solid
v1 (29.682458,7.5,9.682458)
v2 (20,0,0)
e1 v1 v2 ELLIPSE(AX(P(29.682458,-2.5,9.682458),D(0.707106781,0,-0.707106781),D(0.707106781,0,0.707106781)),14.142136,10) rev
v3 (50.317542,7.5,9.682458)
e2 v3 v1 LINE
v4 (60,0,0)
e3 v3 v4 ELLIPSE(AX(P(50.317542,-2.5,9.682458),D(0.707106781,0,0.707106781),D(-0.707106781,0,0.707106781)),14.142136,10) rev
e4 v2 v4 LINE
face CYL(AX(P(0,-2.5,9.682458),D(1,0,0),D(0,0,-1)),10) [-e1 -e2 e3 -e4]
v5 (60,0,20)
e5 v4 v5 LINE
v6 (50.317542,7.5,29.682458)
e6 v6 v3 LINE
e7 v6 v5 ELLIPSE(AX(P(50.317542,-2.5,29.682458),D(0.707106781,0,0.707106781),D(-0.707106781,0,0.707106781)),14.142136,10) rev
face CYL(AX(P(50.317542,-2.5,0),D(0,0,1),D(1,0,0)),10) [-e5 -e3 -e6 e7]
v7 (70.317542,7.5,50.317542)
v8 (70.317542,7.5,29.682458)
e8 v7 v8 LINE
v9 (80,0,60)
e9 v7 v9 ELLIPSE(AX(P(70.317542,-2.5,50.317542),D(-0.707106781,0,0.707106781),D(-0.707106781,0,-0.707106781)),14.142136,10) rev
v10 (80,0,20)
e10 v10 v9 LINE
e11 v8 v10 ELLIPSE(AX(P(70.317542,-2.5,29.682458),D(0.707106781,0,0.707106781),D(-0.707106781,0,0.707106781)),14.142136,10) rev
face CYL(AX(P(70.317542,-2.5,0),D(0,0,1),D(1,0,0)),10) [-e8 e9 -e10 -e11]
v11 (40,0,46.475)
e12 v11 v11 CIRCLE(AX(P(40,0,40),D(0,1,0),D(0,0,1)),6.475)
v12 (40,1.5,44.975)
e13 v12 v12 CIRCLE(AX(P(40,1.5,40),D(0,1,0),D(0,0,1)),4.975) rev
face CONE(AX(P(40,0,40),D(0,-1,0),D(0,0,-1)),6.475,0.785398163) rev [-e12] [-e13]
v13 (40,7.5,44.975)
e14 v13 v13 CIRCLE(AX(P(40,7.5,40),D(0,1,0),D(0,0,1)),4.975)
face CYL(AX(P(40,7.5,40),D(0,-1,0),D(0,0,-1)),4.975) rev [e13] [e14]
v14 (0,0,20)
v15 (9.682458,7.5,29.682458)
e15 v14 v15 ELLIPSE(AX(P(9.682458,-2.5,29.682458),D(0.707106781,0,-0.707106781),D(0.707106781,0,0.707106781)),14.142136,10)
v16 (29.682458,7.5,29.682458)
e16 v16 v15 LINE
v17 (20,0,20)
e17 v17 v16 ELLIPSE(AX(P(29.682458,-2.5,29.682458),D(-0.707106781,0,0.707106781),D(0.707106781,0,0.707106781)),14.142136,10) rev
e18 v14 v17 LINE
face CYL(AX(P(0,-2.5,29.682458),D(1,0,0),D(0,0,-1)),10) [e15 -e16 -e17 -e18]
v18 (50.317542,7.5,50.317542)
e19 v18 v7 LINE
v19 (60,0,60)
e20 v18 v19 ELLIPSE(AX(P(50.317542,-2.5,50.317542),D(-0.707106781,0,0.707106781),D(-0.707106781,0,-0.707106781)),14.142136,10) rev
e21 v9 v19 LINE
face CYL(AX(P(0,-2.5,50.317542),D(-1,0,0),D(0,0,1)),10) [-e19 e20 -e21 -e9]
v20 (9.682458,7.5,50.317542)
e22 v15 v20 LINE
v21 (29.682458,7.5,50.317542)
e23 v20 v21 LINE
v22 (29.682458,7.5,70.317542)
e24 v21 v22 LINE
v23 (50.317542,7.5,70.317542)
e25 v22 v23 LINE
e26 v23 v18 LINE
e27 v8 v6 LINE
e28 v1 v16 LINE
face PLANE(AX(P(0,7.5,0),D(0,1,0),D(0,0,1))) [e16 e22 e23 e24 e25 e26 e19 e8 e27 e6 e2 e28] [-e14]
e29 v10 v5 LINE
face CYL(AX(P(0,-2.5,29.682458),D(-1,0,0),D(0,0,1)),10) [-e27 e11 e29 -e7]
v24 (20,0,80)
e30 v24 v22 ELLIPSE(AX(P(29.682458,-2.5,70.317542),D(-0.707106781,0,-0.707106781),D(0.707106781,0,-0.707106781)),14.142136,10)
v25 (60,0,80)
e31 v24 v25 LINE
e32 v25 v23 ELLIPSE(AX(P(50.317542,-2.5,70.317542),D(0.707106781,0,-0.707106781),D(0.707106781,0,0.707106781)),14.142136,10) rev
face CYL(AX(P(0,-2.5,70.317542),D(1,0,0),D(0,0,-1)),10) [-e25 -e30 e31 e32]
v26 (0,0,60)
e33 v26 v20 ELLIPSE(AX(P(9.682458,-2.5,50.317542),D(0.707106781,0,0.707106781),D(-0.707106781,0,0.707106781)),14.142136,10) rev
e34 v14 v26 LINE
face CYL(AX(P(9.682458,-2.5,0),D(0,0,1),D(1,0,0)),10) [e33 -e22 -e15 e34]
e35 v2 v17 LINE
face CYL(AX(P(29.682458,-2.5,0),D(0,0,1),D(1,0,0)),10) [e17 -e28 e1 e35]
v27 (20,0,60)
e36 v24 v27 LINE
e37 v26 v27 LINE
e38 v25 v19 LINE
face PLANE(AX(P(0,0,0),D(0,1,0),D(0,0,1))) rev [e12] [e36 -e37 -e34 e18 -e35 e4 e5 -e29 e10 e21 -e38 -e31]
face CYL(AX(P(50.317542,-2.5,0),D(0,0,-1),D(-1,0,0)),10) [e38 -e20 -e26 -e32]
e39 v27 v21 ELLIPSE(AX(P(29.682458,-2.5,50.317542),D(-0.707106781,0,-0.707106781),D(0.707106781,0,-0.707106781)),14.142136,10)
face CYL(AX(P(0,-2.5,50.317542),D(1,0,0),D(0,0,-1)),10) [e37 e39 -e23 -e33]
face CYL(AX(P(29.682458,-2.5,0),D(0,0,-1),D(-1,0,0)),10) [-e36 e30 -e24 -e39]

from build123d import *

# Parameters (mm, degrees)
BOSS_EXTRUDE1_DEPTH = 7.5
FILLET1_R           = 10
SKETCH2_R           = 4.975
CUT_EXTRUDE1_DEPTH  = 7.5
CHAMFER1_SIZE       = 1.5


with BuildPart() as part:
    # Sketch1 → Boss-Extrude1 (new body)
    with BuildSketch(Plane(origin=(0, 0, 0), x_dir=(1, 0, 0), z_dir=(0, 1, 0))):
        Polygon((60, 0), (20, 0), (20, -20), (0, -20), (0, -60), (20, -60), (20, -80), (60, -80), (60, -60), (80, -60), (80, -20), (60, -20), align=None)
    extrude(amount=BOSS_EXTRUDE1_DEPTH)

    # Fillet1
    # the kernel refuses this fillet: 10 mm, written as the material it takes off along each edge
    with BuildSketch(Plane(origin=(20, 7.5, -24.206145914), x_dir=(0, -1, 0), z_dir=(0, 0, 1)), Plane(origin=(60, 7.5, 20), x_dir=(0, -1, 0), z_dir=(0, 0, -1)), Plane(origin=(104.206145914, 7.5, 20), x_dir=(0, -1, 0), z_dir=(-1, 0, 0)), Plane(origin=(60, 7.5, 60), x_dir=(0, -1, 0), z_dir=(1, 0, 0)), Plane(origin=(60, 7.5, 104.206145914), x_dir=(0, -1, 0), z_dir=(0, 0, -1)), Plane(origin=(20, 7.5, 60), x_dir=(0, -1, 0), z_dir=(0, 0, 1)), Plane(origin=(-24.206145914, 7.5, 60), x_dir=(0, -1, 0), z_dir=(1, 0, 0)), Plane(origin=(20, 7.5, 20), x_dir=(0, -1, 0), z_dir=(-1, 0, 0))) as fillet1_piece_1:
        with BuildLine():
            CenterArc((10, 9.682458366), FILLET1_R, 180, 75.522487814)
            Line((0, 9.682458366), (-0.2, 9.682458366))
            Line((-0.2, 9.682458366), (-0.2, 0))
            Line((-0.2, 0), (0, -0.2))
            ThreePointArc((0, -0.2), (3.75, -0.2), (7.45, -0.193649167))
            Line((7.45, -0.193649167), (7.5, 0))
        make_face()
    extrude(amount=44.206145914, mode=Mode.SUBTRACT)
    with BuildSketch(Plane(origin=(84.206145914, 7.5, 0), x_dir=(0, -1, 0), z_dir=(-1, 0, 0)), Plane(origin=(80, 7.5, 84.206145914), x_dir=(0, -1, 0), z_dir=(0, 0, -1)), Plane(origin=(-4.206145914, 7.5, 80), x_dir=(0, -1, 0), z_dir=(1, 0, 0)), Plane(origin=(0, 7.5, -4.206145914), x_dir=(0, -1, 0), z_dir=(0, 0, 1))) as fillet1_piece_2:
        with BuildLine():
            CenterArc((10, 9.682458366), FILLET1_R, 180, 75.522487814)
            Line((0, 9.682458366), (-0.2, 9.682458366))
            Line((-0.2, 9.682458366), (-0.2, 0))
            Line((-0.2, 0), (0, -0.2))
            ThreePointArc((0, -0.2), (3.75, -0.2), (7.45, -0.193649167))
            Line((7.45, -0.193649167), (7.5, 0))
        make_face()
    extrude(amount=88.412291828, mode=Mode.SUBTRACT)
    with BuildSketch(Plane(origin=(20, 7.5, -24.206145914), x_dir=(0, -1, 0), z_dir=(0, 0, 1))) as fillet1_piece_3a_section:
        with BuildLine():
            CenterArc((10, 9.682458366), FILLET1_R, 180, 75.522487814)
            Line((0, 9.682458366), (-0.2, 9.682458366))
            Line((-0.2, 9.682458366), (-0.2, 0))
            Line((-0.2, 0), (0, -0.2))
            ThreePointArc((0, -0.2), (3.75, -0.2), (7.45, -0.193649167))
            Line((7.45, -0.193649167), (7.5, 0))
        make_face()
    fillet1_piece_3a = extrude(amount=68.412291828, mode=Mode.PRIVATE)
    fillet1_piece_3a = split(fillet1_piece_3a, bisect_by=Plane(origin=(22.281441008, 5.604082443, 20), z_dir=(0, 0, 1)), keep=Keep.TOP, mode=Mode.PRIVATE)
    with BuildSketch(Plane(origin=(44.206145914, 7.5, 20), x_dir=(0, -1, 0), z_dir=(-1, 0, 0))) as fillet1_piece_3b_section:
        with BuildLine():
            CenterArc((10, 9.682458366), FILLET1_R, 180, 75.522487814)
            Line((0, 9.682458366), (-0.2, 9.682458366))
            Line((-0.2, 9.682458366), (-0.2, 0))
            Line((-0.2, 0), (0, -0.2))
            ThreePointArc((0, -0.2), (3.75, -0.2), (7.45, -0.193649167))
            Line((7.45, -0.193649167), (7.5, 0))
        make_face()
    fillet1_piece_3b = extrude(amount=68.412291828, mode=Mode.PRIVATE)
    fillet1_piece_3b = split(fillet1_piece_3b, bisect_by=Plane(origin=(20, 5.604082443, 22.281441008), z_dir=(1, 0, 0)), keep=Keep.TOP, mode=Mode.PRIVATE)
    fillet1_piece_3 = fillet1_piece_3a & fillet1_piece_3b
    add(fillet1_piece_3, mode=Mode.SUBTRACT)
    with BuildSketch(Plane(origin=(104.206145914, 7.5, 20), x_dir=(0, -1, 0), z_dir=(-1, 0, 0))) as fillet1_piece_4a_section:
        with BuildLine():
            CenterArc((10, 9.682458366), FILLET1_R, 180, 75.522487814)
            Line((0, 9.682458366), (-0.2, 9.682458366))
            Line((-0.2, 9.682458366), (-0.2, 0))
            Line((-0.2, 0), (0, -0.2))
            ThreePointArc((0, -0.2), (3.75, -0.2), (7.45, -0.193649167))
            Line((7.45, -0.193649167), (7.5, 0))
        make_face()
    fillet1_piece_4a = extrude(amount=68.412291828, mode=Mode.PRIVATE)
    fillet1_piece_4a = split(fillet1_piece_4a, bisect_by=Plane(origin=(60, 5.604082443, 22.281441008), z_dir=(-1, 0, 0)), keep=Keep.TOP, mode=Mode.PRIVATE)
    with BuildSketch(Plane(origin=(60, 7.5, 44.206145914), x_dir=(0, -1, 0), z_dir=(0, 0, -1))) as fillet1_piece_4b_section:
        with BuildLine():
            CenterArc((10, 9.682458366), FILLET1_R, 180, 75.522487814)
            Line((0, 9.682458366), (-0.2, 9.682458366))
            Line((-0.2, 9.682458366), (-0.2, 0))
            Line((-0.2, 0), (0, -0.2))
            ThreePointArc((0, -0.2), (3.75, -0.2), (7.45, -0.193649167))
            Line((7.45, -0.193649167), (7.5, 0))
        make_face()
    fillet1_piece_4b = extrude(amount=68.412291828, mode=Mode.PRIVATE)
    fillet1_piece_4b = split(fillet1_piece_4b, bisect_by=Plane(origin=(57.718558992, 5.604082443, 20), z_dir=(0, 0, 1)), keep=Keep.TOP, mode=Mode.PRIVATE)
    fillet1_piece_4 = fillet1_piece_4a & fillet1_piece_4b
    add(fillet1_piece_4, mode=Mode.SUBTRACT)
    with BuildSketch(Plane(origin=(60, 7.5, 104.206145914), x_dir=(0, -1, 0), z_dir=(0, 0, -1))) as fillet1_piece_5a_section:
        with BuildLine():
            CenterArc((10, 9.682458366), FILLET1_R, 180, 75.522487814)
            Line((0, 9.682458366), (-0.2, 9.682458366))
            Line((-0.2, 9.682458366), (-0.2, 0))
            Line((-0.2, 0), (0, -0.2))
            ThreePointArc((0, -0.2), (3.75, -0.2), (7.45, -0.193649167))
            Line((7.45, -0.193649167), (7.5, 0))
        make_face()
    fillet1_piece_5a = extrude(amount=68.412291828, mode=Mode.PRIVATE)
    fillet1_piece_5a = split(fillet1_piece_5a, bisect_by=Plane(origin=(57.718558992, 5.604082443, 60), z_dir=(0, 0, -1)), keep=Keep.TOP, mode=Mode.PRIVATE)
    with BuildSketch(Plane(origin=(35.793854086, 7.5, 60), x_dir=(0, -1, 0), z_dir=(1, 0, 0))) as fillet1_piece_5b_section:
        with BuildLine():
            CenterArc((10, 9.682458366), FILLET1_R, 180, 75.522487814)
            Line((0, 9.682458366), (-0.2, 9.682458366))
            Line((-0.2, 9.682458366), (-0.2, 0))
            Line((-0.2, 0), (0, -0.2))
            ThreePointArc((0, -0.2), (3.75, -0.2), (7.45, -0.193649167))
            Line((7.45, -0.193649167), (7.5, 0))
        make_face()
    fillet1_piece_5b = extrude(amount=68.412291828, mode=Mode.PRIVATE)
    fillet1_piece_5b = split(fillet1_piece_5b, bisect_by=Plane(origin=(60, 5.604082443, 57.718558992), z_dir=(-1, 0, 0)), keep=Keep.TOP, mode=Mode.PRIVATE)
    fillet1_piece_5 = fillet1_piece_5a & fillet1_piece_5b
    add(fillet1_piece_5, mode=Mode.SUBTRACT)
    with BuildSketch(Plane(origin=(-24.206145914, 7.5, 60), x_dir=(0, -1, 0), z_dir=(1, 0, 0))) as fillet1_piece_6a_section:
        with BuildLine():
            CenterArc((10, 9.682458366), FILLET1_R, 180, 75.522487814)
            Line((0, 9.682458366), (-0.2, 9.682458366))
            Line((-0.2, 9.682458366), (-0.2, 0))
            Line((-0.2, 0), (0, -0.2))
            ThreePointArc((0, -0.2), (3.75, -0.2), (7.45, -0.193649167))
            Line((7.45, -0.193649167), (7.5, 0))
        make_face()
    fillet1_piece_6a = extrude(amount=68.412291828, mode=Mode.PRIVATE)
    fillet1_piece_6a = split(fillet1_piece_6a, bisect_by=Plane(origin=(20, 5.604082443, 57.718558992), z_dir=(1, 0, 0)), keep=Keep.TOP, mode=Mode.PRIVATE)
    with BuildSketch(Plane(origin=(20, 7.5, 35.793854086), x_dir=(0, -1, 0), z_dir=(0, 0, 1))) as fillet1_piece_6b_section:
        with BuildLine():
            CenterArc((10, 9.682458366), FILLET1_R, 180, 75.522487814)
            Line((0, 9.682458366), (-0.2, 9.682458366))
            Line((-0.2, 9.682458366), (-0.2, 0))
            Line((-0.2, 0), (0, -0.2))
            ThreePointArc((0, -0.2), (3.75, -0.2), (7.45, -0.193649167))
            Line((7.45, -0.193649167), (7.5, 0))
        make_face()
    fillet1_piece_6b = extrude(amount=68.412291828, mode=Mode.PRIVATE)
    fillet1_piece_6b = split(fillet1_piece_6b, bisect_by=Plane(origin=(22.281441008, 5.604082443, 60), z_dir=(0, 0, -1)), keep=Keep.TOP, mode=Mode.PRIVATE)
    fillet1_piece_6 = fillet1_piece_6a & fillet1_piece_6b
    add(fillet1_piece_6, mode=Mode.SUBTRACT)

    # Sketch2 → Cut-Extrude1 (cut)
    with BuildSketch(Plane(origin=(0, 0, 0), x_dir=(1, 0, 0), z_dir=(0, 1, 0))):
        with Locations(Location((40, -40, 0), (0, 0, 270))):
            Circle(SKETCH2_R)
    extrude(amount=CUT_EXTRUDE1_DEPTH, mode=Mode.SUBTRACT)

    # Chamfer1
    chamfer1_edges = [part.edges().sort_by_distance(p)[0] for p in [
        (40, 0, 35.025),
    ]]
    chamfer(chamfer1_edges, length=CHAMFER1_SIZE)


solid = part.part
